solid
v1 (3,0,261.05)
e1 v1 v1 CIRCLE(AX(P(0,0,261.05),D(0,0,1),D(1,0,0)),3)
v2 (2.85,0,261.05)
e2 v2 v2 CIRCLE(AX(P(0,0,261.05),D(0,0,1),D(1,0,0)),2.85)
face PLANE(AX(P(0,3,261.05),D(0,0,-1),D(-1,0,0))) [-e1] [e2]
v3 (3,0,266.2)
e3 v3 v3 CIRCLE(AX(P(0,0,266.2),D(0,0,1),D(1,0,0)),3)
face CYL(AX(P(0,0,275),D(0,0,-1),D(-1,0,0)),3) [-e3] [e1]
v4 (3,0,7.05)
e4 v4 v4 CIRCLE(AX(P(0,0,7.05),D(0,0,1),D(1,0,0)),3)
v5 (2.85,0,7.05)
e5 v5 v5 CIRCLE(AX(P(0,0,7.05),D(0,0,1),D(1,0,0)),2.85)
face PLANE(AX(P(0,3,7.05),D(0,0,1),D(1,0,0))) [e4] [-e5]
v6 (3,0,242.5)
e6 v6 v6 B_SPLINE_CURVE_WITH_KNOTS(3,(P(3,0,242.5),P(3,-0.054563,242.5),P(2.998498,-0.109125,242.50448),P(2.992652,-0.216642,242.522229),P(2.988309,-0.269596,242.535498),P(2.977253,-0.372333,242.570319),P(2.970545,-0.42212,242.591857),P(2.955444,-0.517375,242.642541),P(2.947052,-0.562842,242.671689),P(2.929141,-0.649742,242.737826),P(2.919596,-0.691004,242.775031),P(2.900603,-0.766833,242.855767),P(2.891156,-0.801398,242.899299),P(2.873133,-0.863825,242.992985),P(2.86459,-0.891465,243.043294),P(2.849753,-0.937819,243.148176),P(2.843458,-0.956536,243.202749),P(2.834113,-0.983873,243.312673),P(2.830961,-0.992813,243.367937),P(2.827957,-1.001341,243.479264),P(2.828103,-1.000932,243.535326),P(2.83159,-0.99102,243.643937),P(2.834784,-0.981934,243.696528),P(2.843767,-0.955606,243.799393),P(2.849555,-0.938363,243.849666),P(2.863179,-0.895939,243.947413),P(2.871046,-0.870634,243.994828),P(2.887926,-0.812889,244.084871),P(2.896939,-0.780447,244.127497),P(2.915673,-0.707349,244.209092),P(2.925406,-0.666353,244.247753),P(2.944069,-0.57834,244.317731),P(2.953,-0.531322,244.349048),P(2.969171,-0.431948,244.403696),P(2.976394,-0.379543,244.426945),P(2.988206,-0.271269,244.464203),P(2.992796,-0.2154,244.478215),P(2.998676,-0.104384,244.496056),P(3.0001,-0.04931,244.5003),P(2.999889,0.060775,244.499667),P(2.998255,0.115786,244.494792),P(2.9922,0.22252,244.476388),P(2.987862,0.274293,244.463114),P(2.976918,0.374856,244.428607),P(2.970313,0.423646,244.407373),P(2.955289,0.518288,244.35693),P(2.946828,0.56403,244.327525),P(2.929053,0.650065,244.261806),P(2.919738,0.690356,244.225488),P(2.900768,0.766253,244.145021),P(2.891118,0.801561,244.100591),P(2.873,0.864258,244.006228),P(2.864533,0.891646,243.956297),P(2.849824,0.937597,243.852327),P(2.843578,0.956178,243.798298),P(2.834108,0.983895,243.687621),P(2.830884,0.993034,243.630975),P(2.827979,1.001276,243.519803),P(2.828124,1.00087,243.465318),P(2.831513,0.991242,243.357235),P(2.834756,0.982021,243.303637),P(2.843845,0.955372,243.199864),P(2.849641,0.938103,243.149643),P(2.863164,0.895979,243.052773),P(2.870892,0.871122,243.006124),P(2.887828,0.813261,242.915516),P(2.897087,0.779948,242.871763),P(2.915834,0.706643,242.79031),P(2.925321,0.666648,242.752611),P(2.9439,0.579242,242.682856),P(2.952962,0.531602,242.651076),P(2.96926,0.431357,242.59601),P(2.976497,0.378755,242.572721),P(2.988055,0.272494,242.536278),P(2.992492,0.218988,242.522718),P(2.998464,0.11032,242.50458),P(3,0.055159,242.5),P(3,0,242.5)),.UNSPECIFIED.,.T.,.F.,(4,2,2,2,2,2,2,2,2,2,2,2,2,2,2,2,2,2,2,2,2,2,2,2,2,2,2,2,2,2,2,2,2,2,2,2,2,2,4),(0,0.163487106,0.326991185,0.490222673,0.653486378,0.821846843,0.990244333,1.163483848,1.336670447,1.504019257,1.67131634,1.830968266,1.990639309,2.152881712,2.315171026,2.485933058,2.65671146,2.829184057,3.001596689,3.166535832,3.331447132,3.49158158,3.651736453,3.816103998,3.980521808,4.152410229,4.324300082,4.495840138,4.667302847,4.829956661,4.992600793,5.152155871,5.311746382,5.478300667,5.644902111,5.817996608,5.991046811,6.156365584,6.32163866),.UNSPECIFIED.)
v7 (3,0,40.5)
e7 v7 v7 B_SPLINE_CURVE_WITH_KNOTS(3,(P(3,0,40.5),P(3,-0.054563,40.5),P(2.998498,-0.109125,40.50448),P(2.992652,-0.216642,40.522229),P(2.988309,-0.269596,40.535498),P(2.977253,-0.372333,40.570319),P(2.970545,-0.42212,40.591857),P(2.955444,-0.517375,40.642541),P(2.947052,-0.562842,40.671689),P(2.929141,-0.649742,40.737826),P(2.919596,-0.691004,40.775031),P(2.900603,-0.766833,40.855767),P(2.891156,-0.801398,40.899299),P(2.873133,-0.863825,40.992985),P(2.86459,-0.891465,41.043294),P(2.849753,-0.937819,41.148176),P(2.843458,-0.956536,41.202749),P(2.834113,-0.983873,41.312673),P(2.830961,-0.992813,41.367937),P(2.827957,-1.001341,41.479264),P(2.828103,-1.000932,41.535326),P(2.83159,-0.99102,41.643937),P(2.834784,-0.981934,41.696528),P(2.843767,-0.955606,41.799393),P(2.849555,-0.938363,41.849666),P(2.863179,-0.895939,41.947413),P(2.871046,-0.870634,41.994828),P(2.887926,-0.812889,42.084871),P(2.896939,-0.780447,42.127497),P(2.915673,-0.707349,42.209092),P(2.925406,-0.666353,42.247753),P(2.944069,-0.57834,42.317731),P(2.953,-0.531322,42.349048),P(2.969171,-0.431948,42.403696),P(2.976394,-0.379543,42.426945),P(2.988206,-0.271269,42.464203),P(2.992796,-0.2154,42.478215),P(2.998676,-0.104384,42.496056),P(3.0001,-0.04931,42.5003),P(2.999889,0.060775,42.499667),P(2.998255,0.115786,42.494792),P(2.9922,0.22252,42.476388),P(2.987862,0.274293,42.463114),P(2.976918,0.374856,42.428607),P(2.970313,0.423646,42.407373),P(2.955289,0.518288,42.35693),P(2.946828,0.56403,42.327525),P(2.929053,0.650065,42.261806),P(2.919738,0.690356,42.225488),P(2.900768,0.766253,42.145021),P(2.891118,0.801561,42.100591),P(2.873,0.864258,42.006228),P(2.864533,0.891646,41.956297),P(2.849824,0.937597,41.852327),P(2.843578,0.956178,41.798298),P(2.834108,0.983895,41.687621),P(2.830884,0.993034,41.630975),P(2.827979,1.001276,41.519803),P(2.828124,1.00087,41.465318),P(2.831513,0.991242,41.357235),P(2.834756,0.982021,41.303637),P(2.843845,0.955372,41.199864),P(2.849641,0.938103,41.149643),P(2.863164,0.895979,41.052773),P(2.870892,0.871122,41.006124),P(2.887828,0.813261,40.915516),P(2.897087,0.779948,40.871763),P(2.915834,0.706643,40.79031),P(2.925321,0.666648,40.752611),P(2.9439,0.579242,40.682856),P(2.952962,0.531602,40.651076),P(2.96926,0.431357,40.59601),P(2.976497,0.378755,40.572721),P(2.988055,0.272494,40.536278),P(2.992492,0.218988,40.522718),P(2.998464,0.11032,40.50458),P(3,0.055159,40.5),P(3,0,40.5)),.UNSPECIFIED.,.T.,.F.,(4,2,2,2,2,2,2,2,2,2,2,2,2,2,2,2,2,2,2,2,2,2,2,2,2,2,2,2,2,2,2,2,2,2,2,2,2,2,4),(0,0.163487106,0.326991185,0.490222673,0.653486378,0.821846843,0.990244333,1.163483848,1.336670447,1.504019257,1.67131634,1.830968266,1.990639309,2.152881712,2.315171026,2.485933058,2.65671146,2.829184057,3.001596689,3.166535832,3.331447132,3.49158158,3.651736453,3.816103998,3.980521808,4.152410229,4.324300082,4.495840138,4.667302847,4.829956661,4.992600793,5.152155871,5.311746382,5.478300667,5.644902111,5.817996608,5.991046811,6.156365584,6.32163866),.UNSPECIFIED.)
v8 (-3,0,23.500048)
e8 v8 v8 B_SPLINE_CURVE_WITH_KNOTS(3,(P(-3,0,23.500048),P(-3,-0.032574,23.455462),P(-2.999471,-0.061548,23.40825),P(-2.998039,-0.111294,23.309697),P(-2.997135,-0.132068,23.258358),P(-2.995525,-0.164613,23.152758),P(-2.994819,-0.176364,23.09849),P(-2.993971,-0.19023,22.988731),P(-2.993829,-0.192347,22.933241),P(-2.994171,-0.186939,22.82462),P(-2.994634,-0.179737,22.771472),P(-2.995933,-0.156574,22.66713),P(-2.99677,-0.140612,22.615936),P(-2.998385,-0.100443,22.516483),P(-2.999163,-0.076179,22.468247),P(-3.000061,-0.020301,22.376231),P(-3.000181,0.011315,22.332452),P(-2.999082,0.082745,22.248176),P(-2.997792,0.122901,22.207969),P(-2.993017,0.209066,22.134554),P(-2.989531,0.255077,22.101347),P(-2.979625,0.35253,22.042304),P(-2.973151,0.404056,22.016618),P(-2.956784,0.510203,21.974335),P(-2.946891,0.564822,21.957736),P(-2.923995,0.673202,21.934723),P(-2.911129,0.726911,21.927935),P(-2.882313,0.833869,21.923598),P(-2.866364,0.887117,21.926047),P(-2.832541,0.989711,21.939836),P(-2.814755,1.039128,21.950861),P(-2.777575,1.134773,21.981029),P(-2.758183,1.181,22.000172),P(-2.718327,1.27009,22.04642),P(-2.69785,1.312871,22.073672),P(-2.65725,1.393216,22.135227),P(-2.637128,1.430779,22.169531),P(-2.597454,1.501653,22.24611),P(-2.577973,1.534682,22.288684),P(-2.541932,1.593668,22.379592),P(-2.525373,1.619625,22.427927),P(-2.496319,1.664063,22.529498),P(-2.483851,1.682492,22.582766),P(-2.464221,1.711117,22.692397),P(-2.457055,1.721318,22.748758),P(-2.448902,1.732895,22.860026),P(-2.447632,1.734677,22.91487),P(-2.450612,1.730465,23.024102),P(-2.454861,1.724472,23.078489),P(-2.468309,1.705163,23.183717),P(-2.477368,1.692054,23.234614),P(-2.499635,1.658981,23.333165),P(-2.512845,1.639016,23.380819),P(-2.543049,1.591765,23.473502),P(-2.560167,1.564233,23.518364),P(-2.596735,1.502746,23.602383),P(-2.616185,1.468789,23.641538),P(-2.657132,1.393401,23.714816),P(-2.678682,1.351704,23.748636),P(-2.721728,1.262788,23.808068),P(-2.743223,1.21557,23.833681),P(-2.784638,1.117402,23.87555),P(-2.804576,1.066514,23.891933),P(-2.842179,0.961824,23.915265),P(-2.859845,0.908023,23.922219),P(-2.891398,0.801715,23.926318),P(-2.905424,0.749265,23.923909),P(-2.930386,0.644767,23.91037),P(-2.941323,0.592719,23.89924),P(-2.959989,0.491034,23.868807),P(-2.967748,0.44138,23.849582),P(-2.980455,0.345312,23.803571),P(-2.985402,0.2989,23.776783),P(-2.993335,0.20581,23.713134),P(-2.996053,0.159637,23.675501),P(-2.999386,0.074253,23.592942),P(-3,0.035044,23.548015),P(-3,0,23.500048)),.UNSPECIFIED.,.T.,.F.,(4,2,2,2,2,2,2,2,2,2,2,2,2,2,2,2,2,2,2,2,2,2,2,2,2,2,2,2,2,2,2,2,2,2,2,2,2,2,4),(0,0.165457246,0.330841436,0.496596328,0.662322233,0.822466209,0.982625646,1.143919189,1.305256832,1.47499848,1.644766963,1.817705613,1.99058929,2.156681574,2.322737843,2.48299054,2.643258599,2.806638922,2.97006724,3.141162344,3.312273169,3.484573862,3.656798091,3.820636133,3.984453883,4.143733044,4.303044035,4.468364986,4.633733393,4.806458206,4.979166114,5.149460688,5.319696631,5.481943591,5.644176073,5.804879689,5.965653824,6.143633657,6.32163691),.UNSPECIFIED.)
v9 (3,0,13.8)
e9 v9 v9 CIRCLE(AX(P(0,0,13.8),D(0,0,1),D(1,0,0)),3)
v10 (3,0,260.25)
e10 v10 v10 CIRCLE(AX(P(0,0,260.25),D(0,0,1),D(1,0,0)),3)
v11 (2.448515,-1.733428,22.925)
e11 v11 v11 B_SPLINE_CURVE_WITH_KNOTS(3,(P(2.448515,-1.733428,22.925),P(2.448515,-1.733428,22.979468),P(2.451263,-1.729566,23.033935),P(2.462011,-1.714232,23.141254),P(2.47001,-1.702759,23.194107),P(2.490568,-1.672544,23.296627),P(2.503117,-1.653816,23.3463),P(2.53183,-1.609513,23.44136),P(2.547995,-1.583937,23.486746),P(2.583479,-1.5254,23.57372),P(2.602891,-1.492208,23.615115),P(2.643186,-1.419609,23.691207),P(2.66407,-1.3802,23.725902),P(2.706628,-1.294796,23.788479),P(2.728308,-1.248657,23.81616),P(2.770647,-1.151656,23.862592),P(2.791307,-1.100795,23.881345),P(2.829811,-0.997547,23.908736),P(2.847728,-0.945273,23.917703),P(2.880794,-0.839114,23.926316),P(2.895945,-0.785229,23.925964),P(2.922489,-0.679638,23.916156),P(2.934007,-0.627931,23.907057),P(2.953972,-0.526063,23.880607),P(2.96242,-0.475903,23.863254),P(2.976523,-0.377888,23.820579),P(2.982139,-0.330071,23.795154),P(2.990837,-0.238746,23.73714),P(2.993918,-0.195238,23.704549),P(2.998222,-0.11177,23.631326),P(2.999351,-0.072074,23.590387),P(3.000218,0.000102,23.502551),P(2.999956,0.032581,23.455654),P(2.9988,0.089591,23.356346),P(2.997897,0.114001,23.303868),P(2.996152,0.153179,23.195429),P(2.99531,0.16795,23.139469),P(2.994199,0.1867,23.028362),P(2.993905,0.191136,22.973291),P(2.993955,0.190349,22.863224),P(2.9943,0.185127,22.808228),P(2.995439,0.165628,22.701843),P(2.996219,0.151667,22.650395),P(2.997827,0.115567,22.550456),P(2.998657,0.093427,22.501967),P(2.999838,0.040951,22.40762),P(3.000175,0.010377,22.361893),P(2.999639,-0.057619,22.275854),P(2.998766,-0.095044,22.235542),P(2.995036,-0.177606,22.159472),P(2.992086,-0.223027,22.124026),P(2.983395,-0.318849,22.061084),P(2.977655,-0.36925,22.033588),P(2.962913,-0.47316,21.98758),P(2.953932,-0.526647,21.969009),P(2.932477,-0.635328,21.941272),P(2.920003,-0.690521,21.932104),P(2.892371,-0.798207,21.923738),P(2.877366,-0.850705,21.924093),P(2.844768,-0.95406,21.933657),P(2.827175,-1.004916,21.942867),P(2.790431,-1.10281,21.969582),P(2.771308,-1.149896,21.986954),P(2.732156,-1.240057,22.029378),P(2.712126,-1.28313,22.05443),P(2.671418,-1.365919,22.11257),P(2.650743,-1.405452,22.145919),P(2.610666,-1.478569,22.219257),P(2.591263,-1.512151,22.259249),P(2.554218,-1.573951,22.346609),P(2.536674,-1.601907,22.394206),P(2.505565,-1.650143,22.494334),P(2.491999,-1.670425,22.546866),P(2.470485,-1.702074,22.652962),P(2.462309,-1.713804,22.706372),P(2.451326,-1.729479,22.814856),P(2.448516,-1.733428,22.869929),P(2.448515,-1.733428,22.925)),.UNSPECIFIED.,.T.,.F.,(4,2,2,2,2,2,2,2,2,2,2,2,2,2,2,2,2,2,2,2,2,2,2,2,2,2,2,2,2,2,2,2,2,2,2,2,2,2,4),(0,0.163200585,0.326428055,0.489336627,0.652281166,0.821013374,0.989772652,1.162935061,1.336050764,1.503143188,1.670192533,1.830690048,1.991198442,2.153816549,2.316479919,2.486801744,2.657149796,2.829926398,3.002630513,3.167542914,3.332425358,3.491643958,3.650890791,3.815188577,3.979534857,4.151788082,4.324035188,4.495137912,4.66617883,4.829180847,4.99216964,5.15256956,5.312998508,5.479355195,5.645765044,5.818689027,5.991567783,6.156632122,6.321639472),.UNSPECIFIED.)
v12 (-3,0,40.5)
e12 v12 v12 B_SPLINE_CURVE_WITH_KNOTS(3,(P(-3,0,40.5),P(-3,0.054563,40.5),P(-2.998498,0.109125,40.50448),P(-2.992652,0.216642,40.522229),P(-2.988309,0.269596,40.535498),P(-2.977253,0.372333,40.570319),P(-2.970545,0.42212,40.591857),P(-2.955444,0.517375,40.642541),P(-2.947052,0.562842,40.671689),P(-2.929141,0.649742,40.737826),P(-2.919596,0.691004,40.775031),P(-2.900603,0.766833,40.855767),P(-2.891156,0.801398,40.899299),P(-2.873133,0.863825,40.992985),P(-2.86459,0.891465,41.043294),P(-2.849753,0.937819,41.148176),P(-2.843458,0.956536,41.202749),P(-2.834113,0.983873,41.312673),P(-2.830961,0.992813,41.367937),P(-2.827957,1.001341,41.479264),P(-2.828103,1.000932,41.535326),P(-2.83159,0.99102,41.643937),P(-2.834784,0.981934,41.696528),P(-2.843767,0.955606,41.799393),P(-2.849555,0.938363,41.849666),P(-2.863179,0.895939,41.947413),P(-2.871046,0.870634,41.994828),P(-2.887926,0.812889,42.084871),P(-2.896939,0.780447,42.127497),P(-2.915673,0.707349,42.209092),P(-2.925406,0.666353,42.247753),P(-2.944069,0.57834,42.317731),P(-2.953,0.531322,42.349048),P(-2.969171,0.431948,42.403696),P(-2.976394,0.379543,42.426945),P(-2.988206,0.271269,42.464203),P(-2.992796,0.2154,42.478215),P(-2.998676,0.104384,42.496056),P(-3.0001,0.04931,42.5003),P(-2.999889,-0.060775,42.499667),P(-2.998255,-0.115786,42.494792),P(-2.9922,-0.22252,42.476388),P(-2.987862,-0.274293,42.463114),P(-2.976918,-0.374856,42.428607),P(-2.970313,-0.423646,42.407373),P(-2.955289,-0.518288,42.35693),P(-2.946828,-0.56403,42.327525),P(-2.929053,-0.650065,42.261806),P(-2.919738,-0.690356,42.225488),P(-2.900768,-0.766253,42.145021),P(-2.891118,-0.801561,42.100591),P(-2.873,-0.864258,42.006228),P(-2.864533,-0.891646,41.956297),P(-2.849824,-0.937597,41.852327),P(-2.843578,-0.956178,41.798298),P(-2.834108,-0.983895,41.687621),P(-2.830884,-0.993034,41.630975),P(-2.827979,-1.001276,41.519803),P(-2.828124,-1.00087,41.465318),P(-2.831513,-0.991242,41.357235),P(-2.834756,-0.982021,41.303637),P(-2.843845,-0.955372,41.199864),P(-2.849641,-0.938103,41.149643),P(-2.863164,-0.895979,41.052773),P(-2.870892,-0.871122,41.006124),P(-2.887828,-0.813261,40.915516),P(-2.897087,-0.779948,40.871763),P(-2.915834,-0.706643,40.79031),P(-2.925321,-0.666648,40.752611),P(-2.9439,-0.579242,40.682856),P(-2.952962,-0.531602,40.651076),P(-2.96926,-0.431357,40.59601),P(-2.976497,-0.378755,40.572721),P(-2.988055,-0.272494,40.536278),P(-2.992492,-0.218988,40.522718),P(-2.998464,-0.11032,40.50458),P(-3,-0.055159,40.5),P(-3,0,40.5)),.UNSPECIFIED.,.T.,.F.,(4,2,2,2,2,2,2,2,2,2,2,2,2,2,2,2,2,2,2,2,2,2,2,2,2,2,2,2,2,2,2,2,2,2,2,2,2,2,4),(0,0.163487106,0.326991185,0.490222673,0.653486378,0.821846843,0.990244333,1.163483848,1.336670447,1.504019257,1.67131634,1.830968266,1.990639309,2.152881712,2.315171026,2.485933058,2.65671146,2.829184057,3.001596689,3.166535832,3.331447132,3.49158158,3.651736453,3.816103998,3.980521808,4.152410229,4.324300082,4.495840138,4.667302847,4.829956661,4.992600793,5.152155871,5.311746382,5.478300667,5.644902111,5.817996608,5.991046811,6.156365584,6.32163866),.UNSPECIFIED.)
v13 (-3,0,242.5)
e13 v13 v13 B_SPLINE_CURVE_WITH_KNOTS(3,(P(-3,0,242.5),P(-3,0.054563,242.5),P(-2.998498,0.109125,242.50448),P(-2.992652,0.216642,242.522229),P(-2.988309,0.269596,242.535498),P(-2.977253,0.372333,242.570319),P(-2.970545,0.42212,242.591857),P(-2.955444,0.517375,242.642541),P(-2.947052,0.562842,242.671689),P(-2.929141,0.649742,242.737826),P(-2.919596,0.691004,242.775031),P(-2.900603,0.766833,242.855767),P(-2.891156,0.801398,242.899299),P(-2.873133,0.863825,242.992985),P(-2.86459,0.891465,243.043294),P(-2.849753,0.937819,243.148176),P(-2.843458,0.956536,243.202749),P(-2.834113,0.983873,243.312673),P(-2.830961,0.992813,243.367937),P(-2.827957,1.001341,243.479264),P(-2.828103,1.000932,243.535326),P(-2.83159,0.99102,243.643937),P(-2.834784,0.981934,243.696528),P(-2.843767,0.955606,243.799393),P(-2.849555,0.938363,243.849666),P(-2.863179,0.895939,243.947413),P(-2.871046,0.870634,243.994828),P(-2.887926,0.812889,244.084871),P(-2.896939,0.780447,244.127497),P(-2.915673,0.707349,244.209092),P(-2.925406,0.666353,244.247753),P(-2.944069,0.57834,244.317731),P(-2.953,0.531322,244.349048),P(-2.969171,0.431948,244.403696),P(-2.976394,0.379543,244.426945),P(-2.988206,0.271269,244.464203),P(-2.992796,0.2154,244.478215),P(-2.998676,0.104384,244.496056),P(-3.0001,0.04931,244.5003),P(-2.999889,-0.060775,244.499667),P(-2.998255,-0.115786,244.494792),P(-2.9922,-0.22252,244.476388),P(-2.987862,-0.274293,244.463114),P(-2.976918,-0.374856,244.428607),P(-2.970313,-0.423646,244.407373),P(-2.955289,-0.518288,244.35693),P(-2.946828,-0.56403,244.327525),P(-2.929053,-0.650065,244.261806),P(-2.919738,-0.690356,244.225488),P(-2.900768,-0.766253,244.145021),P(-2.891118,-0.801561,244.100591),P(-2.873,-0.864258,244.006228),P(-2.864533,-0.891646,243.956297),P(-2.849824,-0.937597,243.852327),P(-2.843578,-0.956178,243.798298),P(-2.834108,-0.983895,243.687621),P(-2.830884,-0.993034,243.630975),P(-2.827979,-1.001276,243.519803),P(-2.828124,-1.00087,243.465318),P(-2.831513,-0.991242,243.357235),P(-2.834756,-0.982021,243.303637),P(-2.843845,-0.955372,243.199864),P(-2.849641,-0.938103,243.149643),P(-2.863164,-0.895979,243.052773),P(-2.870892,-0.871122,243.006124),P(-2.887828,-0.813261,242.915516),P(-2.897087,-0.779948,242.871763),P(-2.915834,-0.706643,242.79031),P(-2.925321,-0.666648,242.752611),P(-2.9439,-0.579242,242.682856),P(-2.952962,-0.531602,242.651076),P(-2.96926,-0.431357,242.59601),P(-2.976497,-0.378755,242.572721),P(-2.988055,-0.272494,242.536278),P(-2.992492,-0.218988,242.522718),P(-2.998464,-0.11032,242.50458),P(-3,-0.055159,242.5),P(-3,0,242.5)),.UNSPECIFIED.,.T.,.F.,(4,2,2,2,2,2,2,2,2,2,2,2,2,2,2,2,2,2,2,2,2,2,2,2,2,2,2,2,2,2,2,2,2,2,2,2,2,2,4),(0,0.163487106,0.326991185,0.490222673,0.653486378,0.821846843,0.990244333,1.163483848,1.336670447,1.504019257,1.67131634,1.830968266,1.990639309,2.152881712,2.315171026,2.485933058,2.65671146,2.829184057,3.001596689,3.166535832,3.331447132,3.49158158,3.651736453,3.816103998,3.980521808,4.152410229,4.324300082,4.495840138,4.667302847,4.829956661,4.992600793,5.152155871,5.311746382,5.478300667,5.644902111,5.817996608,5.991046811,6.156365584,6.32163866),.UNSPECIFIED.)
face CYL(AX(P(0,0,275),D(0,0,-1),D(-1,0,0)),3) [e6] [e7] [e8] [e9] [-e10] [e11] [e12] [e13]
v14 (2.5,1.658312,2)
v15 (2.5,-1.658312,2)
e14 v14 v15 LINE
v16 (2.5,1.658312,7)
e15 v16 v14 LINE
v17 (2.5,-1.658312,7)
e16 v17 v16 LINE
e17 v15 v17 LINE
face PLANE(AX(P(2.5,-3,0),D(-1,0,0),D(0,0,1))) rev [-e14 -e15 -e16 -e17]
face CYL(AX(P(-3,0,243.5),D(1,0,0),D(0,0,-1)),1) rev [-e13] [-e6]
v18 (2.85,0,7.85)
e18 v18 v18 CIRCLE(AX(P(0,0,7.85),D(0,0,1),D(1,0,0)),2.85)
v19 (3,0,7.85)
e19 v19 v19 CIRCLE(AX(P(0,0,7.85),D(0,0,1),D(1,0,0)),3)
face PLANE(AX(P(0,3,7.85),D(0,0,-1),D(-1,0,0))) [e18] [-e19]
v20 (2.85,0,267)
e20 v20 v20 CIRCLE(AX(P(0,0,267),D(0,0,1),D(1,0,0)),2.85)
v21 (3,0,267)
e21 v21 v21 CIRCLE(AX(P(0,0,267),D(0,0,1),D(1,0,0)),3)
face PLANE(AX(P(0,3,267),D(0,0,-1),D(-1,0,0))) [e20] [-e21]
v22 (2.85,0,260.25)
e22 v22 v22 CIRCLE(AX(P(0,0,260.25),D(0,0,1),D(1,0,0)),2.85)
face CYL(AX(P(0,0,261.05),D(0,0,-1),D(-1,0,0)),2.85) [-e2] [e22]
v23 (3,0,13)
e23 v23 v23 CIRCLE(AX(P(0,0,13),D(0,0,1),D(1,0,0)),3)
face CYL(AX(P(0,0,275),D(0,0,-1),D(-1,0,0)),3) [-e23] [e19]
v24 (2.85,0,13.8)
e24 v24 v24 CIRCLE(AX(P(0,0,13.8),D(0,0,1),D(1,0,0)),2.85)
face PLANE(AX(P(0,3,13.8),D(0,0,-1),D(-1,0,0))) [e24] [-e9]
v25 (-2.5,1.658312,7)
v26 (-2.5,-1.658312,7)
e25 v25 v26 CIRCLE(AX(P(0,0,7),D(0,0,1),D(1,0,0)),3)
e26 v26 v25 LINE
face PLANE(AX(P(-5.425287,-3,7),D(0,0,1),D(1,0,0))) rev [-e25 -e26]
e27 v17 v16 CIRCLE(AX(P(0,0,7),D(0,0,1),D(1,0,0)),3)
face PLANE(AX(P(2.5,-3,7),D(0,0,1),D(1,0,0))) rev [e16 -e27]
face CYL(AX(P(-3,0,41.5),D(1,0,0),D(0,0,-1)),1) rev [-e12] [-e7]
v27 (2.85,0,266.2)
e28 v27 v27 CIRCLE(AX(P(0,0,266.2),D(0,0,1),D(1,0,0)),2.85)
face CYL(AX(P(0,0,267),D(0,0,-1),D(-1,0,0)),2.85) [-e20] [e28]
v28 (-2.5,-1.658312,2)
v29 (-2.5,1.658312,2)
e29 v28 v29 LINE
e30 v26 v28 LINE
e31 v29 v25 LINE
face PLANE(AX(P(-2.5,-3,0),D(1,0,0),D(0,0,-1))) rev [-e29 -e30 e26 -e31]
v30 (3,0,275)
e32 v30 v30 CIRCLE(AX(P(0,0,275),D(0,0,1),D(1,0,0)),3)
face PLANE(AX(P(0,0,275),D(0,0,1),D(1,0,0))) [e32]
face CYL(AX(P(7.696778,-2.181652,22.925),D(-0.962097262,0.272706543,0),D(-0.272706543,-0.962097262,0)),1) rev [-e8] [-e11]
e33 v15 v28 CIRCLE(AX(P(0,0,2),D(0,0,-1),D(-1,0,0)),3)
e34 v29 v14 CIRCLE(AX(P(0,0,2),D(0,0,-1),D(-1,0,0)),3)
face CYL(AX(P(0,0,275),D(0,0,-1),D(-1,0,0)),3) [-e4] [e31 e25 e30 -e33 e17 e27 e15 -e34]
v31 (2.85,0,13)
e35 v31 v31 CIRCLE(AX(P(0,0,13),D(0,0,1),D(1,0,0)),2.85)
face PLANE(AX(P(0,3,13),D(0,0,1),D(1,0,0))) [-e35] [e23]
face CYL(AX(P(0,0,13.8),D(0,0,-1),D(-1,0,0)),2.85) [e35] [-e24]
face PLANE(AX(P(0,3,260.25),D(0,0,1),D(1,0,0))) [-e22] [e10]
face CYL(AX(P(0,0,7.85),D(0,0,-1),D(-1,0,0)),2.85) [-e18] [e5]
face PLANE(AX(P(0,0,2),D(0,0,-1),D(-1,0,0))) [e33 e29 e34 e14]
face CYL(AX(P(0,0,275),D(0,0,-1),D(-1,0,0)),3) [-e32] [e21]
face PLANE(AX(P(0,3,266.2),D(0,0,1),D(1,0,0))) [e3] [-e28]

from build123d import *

# Parameters (mm, degrees)
SKETCH1_R                                  = 3
BOSS_EXTRUDE1_DEPTH                        = 275
SKETCH3_W                                  = 0.8
SKETCH3_H                                  = 0.5
CUT_EXTRUDE2_DEPTH                         = 276.032725326
CUT_EXTRUDE2_DEPTH_BACK                    = 276.032725326
SKETCH4_W                                  = 3.470061058
SKETCH4_H                                  = 7
SKETCH4_W_2                                = 2.92528695
CHAMFER1_SIZE                              = 0.3
RETAINING_GROOVES_D5P7_1_START             = 7.05
SKETCH5_R                                  = 2.85
SKETCH5_R_2                                = 2.49
RETAINING_GROOVES_D5P7_1_DEPTH             = 0.8
RETAINING_GROOVES_D5P7_2_START             = 13
SKETCH6_R                                  = 2.85
SKETCH6_R_2                                = 2.49
RETAINING_GROOVES_D5P7_2_DEPTH             = 0.8
RETAINING_GROOVES_D5P7_3_START             = 260.25
SKETCH7_R                                  = 2.85
SKETCH7_R_2                                = 2.49
RETAINING_GROOVES_D5P7_3_DEPTH             = 0.8
RETAINING_GROOVES_D5P7_4_START             = 266.2
SKETCH8_R                                  = 2.85
SKETCH8_R_2                                = 2.49
RETAINING_GROOVES_D5P7_4_DEPTH             = 0.8
TWO_HUB_CROSS_PIN_D2_DEPTH                 = 276.032725326
TWO_HUB_CROSS_PIN_D2_DEPTH_BACK            = 276.032725326
SKETCH9_R                                  = 1
SKETCH10_R                                 = 3.1
REVB_LOWER_SHAFT_NOSE_CLEARANCE_2MM_DEPTH  = 2
REVB_OLDHAM_D2_DRIVE_PIN_CLOCKED_HOLE_OU_W = 1
REVB_OLDHAM_D2_DRIVE_PIN_CLOCKED_HOLE_OU_H = 6.000106441


# Read off the part's stored shape, not the designer's step: RevB_Oldham_D2_Drive_Pin_Clocked_Hole
with BuildPart() as part:
    # Sketch1 → Boss-Extrude1 (new body)
    with BuildSketch(Plane.XY):
        Circle(SKETCH1_R)
    extrude(amount=BOSS_EXTRUDE1_DEPTH)

    # Sketch3 → Cut-Revolve1 (revolve, cut)
    with BuildSketch(Plane(origin=(0, 0, 0), x_dir=(0, 0, -1), z_dir=(1, 0, 0)), mode=Mode.PRIVATE) as cut_revolve1_sk:
        with Locations((-266.6, 2.75)):
            Rectangle(SKETCH3_W, SKETCH3_H)
        with Locations((-260.65, 2.75)):
            Rectangle(SKETCH3_W, SKETCH3_H)
        with Locations((-13.4, 2.75)):
            Rectangle(SKETCH3_W, SKETCH3_H)
        with Locations((-7.45, 2.75)):
            Rectangle(SKETCH3_W, SKETCH3_H)
    revolve(cut_revolve1_sk.sketch.rotate(Axis((0, 0, 263.365004794), (0, 0, -1)), 90), axis=Axis((0, 0, 263.365004794), (0, 0, -1)), mode=Mode.SUBTRACT)

    # Sketch4 → Cut-Extrude2 (cut, two sides: drawn at the far end of the back side and taken through both)
    with BuildSketch(Plane(origin=(0, 0, 0), x_dir=(1, 0, 0), z_dir=(0, 1, 0)).offset(-CUT_EXTRUDE2_DEPTH_BACK)):
        with Locations((4.235030529, -3.5)):
            Rectangle(SKETCH4_W, SKETCH4_H)
        with Locations((-3.962643475, -3.5)):
            Rectangle(SKETCH4_W_2, SKETCH4_H)
    extrude(amount=CUT_EXTRUDE2_DEPTH + CUT_EXTRUDE2_DEPTH_BACK, mode=Mode.SUBTRACT)

    # Chamfer1
    chamfer1_edges = [part.edges().sort_by_distance(p)[0] for p in [
        (0, 3, 0),
        (0, -3, 0),
    ]]
    chamfer(chamfer1_edges, length=CHAMFER1_SIZE)

    # Sketch5 → Retaining_Grooves_D5p7_1 (add)
    with BuildSketch(Plane.XY.offset(RETAINING_GROOVES_D5P7_1_START)):
        Circle(SKETCH5_R)
        Circle(SKETCH5_R_2, mode=Mode.SUBTRACT)
    extrude(amount=RETAINING_GROOVES_D5P7_1_DEPTH)

    # Sketch6 → Retaining_Grooves_D5p7_2 (add)
    with BuildSketch(Plane.XY.offset(RETAINING_GROOVES_D5P7_2_START)):
        Circle(SKETCH6_R)
        Circle(SKETCH6_R_2, mode=Mode.SUBTRACT)
    extrude(amount=RETAINING_GROOVES_D5P7_2_DEPTH)

    # Sketch7 → Retaining_Grooves_D5p7_3 (add)
    with BuildSketch(Plane.XY.offset(RETAINING_GROOVES_D5P7_3_START)):
        Circle(SKETCH7_R)
        Circle(SKETCH7_R_2, mode=Mode.SUBTRACT)
    extrude(amount=RETAINING_GROOVES_D5P7_3_DEPTH)

    # Sketch8 → Retaining_Grooves_D5p7_4 (add)
    with BuildSketch(Plane.XY.offset(RETAINING_GROOVES_D5P7_4_START)):
        Circle(SKETCH8_R)
        Circle(SKETCH8_R_2, mode=Mode.SUBTRACT)
    extrude(amount=RETAINING_GROOVES_D5P7_4_DEPTH)

    # Sketch9 → Two_Hub_Cross_Pin_D2 (cut, two sides: drawn at the far end of the back side and taken through both)
    with BuildSketch(Plane(origin=(0, 0, 0), x_dir=(0, 0, -1), z_dir=(1, 0, 0)).offset(-TWO_HUB_CROSS_PIN_D2_DEPTH_BACK)):
        with Locations((-41.5, 0)):
            Circle(SKETCH9_R)
        with Locations((-243.5, 0)):
            Circle(SKETCH9_R)
    extrude(amount=TWO_HUB_CROSS_PIN_D2_DEPTH + TWO_HUB_CROSS_PIN_D2_DEPTH_BACK, mode=Mode.SUBTRACT)

    # Sketch10 → RevB_Lower_Shaft_Nose_Clearance_2mm (cut)
    with BuildSketch(Plane(origin=(0, 0, 0), x_dir=(-1, 0, 0), z_dir=(0, 0, -1))):
        Circle(SKETCH10_R)
    extrude(amount=-REVB_LOWER_SHAFT_NOSE_CLEARANCE_2MM_DEPTH, mode=Mode.SUBTRACT)

    # RevB_Oldham_D2_Drive_Pin_Clocked_Hole ou → RevB_Oldham_D2_Drive_Pin_Clocked_Hole (revolve, cut)
    with BuildSketch(Plane(origin=(0, 0, 22.925), x_dir=(0.2727065426398811, 0.962097262027807, 0), z_dir=(0, 0, -1))):
        with Locations((0.5, 2.6843e-05)):
            Rectangle(REVB_OLDHAM_D2_DRIVE_PIN_CLOCKED_HOLE_OU_W, REVB_OLDHAM_D2_DRIVE_PIN_CLOCKED_HOLE_OU_H)
    revolve(axis=Axis((0, 0, 22.925), (0.962097262027807, -0.2727065426398811, 0)), mode=Mode.SUBTRACT)


solid = part.part
